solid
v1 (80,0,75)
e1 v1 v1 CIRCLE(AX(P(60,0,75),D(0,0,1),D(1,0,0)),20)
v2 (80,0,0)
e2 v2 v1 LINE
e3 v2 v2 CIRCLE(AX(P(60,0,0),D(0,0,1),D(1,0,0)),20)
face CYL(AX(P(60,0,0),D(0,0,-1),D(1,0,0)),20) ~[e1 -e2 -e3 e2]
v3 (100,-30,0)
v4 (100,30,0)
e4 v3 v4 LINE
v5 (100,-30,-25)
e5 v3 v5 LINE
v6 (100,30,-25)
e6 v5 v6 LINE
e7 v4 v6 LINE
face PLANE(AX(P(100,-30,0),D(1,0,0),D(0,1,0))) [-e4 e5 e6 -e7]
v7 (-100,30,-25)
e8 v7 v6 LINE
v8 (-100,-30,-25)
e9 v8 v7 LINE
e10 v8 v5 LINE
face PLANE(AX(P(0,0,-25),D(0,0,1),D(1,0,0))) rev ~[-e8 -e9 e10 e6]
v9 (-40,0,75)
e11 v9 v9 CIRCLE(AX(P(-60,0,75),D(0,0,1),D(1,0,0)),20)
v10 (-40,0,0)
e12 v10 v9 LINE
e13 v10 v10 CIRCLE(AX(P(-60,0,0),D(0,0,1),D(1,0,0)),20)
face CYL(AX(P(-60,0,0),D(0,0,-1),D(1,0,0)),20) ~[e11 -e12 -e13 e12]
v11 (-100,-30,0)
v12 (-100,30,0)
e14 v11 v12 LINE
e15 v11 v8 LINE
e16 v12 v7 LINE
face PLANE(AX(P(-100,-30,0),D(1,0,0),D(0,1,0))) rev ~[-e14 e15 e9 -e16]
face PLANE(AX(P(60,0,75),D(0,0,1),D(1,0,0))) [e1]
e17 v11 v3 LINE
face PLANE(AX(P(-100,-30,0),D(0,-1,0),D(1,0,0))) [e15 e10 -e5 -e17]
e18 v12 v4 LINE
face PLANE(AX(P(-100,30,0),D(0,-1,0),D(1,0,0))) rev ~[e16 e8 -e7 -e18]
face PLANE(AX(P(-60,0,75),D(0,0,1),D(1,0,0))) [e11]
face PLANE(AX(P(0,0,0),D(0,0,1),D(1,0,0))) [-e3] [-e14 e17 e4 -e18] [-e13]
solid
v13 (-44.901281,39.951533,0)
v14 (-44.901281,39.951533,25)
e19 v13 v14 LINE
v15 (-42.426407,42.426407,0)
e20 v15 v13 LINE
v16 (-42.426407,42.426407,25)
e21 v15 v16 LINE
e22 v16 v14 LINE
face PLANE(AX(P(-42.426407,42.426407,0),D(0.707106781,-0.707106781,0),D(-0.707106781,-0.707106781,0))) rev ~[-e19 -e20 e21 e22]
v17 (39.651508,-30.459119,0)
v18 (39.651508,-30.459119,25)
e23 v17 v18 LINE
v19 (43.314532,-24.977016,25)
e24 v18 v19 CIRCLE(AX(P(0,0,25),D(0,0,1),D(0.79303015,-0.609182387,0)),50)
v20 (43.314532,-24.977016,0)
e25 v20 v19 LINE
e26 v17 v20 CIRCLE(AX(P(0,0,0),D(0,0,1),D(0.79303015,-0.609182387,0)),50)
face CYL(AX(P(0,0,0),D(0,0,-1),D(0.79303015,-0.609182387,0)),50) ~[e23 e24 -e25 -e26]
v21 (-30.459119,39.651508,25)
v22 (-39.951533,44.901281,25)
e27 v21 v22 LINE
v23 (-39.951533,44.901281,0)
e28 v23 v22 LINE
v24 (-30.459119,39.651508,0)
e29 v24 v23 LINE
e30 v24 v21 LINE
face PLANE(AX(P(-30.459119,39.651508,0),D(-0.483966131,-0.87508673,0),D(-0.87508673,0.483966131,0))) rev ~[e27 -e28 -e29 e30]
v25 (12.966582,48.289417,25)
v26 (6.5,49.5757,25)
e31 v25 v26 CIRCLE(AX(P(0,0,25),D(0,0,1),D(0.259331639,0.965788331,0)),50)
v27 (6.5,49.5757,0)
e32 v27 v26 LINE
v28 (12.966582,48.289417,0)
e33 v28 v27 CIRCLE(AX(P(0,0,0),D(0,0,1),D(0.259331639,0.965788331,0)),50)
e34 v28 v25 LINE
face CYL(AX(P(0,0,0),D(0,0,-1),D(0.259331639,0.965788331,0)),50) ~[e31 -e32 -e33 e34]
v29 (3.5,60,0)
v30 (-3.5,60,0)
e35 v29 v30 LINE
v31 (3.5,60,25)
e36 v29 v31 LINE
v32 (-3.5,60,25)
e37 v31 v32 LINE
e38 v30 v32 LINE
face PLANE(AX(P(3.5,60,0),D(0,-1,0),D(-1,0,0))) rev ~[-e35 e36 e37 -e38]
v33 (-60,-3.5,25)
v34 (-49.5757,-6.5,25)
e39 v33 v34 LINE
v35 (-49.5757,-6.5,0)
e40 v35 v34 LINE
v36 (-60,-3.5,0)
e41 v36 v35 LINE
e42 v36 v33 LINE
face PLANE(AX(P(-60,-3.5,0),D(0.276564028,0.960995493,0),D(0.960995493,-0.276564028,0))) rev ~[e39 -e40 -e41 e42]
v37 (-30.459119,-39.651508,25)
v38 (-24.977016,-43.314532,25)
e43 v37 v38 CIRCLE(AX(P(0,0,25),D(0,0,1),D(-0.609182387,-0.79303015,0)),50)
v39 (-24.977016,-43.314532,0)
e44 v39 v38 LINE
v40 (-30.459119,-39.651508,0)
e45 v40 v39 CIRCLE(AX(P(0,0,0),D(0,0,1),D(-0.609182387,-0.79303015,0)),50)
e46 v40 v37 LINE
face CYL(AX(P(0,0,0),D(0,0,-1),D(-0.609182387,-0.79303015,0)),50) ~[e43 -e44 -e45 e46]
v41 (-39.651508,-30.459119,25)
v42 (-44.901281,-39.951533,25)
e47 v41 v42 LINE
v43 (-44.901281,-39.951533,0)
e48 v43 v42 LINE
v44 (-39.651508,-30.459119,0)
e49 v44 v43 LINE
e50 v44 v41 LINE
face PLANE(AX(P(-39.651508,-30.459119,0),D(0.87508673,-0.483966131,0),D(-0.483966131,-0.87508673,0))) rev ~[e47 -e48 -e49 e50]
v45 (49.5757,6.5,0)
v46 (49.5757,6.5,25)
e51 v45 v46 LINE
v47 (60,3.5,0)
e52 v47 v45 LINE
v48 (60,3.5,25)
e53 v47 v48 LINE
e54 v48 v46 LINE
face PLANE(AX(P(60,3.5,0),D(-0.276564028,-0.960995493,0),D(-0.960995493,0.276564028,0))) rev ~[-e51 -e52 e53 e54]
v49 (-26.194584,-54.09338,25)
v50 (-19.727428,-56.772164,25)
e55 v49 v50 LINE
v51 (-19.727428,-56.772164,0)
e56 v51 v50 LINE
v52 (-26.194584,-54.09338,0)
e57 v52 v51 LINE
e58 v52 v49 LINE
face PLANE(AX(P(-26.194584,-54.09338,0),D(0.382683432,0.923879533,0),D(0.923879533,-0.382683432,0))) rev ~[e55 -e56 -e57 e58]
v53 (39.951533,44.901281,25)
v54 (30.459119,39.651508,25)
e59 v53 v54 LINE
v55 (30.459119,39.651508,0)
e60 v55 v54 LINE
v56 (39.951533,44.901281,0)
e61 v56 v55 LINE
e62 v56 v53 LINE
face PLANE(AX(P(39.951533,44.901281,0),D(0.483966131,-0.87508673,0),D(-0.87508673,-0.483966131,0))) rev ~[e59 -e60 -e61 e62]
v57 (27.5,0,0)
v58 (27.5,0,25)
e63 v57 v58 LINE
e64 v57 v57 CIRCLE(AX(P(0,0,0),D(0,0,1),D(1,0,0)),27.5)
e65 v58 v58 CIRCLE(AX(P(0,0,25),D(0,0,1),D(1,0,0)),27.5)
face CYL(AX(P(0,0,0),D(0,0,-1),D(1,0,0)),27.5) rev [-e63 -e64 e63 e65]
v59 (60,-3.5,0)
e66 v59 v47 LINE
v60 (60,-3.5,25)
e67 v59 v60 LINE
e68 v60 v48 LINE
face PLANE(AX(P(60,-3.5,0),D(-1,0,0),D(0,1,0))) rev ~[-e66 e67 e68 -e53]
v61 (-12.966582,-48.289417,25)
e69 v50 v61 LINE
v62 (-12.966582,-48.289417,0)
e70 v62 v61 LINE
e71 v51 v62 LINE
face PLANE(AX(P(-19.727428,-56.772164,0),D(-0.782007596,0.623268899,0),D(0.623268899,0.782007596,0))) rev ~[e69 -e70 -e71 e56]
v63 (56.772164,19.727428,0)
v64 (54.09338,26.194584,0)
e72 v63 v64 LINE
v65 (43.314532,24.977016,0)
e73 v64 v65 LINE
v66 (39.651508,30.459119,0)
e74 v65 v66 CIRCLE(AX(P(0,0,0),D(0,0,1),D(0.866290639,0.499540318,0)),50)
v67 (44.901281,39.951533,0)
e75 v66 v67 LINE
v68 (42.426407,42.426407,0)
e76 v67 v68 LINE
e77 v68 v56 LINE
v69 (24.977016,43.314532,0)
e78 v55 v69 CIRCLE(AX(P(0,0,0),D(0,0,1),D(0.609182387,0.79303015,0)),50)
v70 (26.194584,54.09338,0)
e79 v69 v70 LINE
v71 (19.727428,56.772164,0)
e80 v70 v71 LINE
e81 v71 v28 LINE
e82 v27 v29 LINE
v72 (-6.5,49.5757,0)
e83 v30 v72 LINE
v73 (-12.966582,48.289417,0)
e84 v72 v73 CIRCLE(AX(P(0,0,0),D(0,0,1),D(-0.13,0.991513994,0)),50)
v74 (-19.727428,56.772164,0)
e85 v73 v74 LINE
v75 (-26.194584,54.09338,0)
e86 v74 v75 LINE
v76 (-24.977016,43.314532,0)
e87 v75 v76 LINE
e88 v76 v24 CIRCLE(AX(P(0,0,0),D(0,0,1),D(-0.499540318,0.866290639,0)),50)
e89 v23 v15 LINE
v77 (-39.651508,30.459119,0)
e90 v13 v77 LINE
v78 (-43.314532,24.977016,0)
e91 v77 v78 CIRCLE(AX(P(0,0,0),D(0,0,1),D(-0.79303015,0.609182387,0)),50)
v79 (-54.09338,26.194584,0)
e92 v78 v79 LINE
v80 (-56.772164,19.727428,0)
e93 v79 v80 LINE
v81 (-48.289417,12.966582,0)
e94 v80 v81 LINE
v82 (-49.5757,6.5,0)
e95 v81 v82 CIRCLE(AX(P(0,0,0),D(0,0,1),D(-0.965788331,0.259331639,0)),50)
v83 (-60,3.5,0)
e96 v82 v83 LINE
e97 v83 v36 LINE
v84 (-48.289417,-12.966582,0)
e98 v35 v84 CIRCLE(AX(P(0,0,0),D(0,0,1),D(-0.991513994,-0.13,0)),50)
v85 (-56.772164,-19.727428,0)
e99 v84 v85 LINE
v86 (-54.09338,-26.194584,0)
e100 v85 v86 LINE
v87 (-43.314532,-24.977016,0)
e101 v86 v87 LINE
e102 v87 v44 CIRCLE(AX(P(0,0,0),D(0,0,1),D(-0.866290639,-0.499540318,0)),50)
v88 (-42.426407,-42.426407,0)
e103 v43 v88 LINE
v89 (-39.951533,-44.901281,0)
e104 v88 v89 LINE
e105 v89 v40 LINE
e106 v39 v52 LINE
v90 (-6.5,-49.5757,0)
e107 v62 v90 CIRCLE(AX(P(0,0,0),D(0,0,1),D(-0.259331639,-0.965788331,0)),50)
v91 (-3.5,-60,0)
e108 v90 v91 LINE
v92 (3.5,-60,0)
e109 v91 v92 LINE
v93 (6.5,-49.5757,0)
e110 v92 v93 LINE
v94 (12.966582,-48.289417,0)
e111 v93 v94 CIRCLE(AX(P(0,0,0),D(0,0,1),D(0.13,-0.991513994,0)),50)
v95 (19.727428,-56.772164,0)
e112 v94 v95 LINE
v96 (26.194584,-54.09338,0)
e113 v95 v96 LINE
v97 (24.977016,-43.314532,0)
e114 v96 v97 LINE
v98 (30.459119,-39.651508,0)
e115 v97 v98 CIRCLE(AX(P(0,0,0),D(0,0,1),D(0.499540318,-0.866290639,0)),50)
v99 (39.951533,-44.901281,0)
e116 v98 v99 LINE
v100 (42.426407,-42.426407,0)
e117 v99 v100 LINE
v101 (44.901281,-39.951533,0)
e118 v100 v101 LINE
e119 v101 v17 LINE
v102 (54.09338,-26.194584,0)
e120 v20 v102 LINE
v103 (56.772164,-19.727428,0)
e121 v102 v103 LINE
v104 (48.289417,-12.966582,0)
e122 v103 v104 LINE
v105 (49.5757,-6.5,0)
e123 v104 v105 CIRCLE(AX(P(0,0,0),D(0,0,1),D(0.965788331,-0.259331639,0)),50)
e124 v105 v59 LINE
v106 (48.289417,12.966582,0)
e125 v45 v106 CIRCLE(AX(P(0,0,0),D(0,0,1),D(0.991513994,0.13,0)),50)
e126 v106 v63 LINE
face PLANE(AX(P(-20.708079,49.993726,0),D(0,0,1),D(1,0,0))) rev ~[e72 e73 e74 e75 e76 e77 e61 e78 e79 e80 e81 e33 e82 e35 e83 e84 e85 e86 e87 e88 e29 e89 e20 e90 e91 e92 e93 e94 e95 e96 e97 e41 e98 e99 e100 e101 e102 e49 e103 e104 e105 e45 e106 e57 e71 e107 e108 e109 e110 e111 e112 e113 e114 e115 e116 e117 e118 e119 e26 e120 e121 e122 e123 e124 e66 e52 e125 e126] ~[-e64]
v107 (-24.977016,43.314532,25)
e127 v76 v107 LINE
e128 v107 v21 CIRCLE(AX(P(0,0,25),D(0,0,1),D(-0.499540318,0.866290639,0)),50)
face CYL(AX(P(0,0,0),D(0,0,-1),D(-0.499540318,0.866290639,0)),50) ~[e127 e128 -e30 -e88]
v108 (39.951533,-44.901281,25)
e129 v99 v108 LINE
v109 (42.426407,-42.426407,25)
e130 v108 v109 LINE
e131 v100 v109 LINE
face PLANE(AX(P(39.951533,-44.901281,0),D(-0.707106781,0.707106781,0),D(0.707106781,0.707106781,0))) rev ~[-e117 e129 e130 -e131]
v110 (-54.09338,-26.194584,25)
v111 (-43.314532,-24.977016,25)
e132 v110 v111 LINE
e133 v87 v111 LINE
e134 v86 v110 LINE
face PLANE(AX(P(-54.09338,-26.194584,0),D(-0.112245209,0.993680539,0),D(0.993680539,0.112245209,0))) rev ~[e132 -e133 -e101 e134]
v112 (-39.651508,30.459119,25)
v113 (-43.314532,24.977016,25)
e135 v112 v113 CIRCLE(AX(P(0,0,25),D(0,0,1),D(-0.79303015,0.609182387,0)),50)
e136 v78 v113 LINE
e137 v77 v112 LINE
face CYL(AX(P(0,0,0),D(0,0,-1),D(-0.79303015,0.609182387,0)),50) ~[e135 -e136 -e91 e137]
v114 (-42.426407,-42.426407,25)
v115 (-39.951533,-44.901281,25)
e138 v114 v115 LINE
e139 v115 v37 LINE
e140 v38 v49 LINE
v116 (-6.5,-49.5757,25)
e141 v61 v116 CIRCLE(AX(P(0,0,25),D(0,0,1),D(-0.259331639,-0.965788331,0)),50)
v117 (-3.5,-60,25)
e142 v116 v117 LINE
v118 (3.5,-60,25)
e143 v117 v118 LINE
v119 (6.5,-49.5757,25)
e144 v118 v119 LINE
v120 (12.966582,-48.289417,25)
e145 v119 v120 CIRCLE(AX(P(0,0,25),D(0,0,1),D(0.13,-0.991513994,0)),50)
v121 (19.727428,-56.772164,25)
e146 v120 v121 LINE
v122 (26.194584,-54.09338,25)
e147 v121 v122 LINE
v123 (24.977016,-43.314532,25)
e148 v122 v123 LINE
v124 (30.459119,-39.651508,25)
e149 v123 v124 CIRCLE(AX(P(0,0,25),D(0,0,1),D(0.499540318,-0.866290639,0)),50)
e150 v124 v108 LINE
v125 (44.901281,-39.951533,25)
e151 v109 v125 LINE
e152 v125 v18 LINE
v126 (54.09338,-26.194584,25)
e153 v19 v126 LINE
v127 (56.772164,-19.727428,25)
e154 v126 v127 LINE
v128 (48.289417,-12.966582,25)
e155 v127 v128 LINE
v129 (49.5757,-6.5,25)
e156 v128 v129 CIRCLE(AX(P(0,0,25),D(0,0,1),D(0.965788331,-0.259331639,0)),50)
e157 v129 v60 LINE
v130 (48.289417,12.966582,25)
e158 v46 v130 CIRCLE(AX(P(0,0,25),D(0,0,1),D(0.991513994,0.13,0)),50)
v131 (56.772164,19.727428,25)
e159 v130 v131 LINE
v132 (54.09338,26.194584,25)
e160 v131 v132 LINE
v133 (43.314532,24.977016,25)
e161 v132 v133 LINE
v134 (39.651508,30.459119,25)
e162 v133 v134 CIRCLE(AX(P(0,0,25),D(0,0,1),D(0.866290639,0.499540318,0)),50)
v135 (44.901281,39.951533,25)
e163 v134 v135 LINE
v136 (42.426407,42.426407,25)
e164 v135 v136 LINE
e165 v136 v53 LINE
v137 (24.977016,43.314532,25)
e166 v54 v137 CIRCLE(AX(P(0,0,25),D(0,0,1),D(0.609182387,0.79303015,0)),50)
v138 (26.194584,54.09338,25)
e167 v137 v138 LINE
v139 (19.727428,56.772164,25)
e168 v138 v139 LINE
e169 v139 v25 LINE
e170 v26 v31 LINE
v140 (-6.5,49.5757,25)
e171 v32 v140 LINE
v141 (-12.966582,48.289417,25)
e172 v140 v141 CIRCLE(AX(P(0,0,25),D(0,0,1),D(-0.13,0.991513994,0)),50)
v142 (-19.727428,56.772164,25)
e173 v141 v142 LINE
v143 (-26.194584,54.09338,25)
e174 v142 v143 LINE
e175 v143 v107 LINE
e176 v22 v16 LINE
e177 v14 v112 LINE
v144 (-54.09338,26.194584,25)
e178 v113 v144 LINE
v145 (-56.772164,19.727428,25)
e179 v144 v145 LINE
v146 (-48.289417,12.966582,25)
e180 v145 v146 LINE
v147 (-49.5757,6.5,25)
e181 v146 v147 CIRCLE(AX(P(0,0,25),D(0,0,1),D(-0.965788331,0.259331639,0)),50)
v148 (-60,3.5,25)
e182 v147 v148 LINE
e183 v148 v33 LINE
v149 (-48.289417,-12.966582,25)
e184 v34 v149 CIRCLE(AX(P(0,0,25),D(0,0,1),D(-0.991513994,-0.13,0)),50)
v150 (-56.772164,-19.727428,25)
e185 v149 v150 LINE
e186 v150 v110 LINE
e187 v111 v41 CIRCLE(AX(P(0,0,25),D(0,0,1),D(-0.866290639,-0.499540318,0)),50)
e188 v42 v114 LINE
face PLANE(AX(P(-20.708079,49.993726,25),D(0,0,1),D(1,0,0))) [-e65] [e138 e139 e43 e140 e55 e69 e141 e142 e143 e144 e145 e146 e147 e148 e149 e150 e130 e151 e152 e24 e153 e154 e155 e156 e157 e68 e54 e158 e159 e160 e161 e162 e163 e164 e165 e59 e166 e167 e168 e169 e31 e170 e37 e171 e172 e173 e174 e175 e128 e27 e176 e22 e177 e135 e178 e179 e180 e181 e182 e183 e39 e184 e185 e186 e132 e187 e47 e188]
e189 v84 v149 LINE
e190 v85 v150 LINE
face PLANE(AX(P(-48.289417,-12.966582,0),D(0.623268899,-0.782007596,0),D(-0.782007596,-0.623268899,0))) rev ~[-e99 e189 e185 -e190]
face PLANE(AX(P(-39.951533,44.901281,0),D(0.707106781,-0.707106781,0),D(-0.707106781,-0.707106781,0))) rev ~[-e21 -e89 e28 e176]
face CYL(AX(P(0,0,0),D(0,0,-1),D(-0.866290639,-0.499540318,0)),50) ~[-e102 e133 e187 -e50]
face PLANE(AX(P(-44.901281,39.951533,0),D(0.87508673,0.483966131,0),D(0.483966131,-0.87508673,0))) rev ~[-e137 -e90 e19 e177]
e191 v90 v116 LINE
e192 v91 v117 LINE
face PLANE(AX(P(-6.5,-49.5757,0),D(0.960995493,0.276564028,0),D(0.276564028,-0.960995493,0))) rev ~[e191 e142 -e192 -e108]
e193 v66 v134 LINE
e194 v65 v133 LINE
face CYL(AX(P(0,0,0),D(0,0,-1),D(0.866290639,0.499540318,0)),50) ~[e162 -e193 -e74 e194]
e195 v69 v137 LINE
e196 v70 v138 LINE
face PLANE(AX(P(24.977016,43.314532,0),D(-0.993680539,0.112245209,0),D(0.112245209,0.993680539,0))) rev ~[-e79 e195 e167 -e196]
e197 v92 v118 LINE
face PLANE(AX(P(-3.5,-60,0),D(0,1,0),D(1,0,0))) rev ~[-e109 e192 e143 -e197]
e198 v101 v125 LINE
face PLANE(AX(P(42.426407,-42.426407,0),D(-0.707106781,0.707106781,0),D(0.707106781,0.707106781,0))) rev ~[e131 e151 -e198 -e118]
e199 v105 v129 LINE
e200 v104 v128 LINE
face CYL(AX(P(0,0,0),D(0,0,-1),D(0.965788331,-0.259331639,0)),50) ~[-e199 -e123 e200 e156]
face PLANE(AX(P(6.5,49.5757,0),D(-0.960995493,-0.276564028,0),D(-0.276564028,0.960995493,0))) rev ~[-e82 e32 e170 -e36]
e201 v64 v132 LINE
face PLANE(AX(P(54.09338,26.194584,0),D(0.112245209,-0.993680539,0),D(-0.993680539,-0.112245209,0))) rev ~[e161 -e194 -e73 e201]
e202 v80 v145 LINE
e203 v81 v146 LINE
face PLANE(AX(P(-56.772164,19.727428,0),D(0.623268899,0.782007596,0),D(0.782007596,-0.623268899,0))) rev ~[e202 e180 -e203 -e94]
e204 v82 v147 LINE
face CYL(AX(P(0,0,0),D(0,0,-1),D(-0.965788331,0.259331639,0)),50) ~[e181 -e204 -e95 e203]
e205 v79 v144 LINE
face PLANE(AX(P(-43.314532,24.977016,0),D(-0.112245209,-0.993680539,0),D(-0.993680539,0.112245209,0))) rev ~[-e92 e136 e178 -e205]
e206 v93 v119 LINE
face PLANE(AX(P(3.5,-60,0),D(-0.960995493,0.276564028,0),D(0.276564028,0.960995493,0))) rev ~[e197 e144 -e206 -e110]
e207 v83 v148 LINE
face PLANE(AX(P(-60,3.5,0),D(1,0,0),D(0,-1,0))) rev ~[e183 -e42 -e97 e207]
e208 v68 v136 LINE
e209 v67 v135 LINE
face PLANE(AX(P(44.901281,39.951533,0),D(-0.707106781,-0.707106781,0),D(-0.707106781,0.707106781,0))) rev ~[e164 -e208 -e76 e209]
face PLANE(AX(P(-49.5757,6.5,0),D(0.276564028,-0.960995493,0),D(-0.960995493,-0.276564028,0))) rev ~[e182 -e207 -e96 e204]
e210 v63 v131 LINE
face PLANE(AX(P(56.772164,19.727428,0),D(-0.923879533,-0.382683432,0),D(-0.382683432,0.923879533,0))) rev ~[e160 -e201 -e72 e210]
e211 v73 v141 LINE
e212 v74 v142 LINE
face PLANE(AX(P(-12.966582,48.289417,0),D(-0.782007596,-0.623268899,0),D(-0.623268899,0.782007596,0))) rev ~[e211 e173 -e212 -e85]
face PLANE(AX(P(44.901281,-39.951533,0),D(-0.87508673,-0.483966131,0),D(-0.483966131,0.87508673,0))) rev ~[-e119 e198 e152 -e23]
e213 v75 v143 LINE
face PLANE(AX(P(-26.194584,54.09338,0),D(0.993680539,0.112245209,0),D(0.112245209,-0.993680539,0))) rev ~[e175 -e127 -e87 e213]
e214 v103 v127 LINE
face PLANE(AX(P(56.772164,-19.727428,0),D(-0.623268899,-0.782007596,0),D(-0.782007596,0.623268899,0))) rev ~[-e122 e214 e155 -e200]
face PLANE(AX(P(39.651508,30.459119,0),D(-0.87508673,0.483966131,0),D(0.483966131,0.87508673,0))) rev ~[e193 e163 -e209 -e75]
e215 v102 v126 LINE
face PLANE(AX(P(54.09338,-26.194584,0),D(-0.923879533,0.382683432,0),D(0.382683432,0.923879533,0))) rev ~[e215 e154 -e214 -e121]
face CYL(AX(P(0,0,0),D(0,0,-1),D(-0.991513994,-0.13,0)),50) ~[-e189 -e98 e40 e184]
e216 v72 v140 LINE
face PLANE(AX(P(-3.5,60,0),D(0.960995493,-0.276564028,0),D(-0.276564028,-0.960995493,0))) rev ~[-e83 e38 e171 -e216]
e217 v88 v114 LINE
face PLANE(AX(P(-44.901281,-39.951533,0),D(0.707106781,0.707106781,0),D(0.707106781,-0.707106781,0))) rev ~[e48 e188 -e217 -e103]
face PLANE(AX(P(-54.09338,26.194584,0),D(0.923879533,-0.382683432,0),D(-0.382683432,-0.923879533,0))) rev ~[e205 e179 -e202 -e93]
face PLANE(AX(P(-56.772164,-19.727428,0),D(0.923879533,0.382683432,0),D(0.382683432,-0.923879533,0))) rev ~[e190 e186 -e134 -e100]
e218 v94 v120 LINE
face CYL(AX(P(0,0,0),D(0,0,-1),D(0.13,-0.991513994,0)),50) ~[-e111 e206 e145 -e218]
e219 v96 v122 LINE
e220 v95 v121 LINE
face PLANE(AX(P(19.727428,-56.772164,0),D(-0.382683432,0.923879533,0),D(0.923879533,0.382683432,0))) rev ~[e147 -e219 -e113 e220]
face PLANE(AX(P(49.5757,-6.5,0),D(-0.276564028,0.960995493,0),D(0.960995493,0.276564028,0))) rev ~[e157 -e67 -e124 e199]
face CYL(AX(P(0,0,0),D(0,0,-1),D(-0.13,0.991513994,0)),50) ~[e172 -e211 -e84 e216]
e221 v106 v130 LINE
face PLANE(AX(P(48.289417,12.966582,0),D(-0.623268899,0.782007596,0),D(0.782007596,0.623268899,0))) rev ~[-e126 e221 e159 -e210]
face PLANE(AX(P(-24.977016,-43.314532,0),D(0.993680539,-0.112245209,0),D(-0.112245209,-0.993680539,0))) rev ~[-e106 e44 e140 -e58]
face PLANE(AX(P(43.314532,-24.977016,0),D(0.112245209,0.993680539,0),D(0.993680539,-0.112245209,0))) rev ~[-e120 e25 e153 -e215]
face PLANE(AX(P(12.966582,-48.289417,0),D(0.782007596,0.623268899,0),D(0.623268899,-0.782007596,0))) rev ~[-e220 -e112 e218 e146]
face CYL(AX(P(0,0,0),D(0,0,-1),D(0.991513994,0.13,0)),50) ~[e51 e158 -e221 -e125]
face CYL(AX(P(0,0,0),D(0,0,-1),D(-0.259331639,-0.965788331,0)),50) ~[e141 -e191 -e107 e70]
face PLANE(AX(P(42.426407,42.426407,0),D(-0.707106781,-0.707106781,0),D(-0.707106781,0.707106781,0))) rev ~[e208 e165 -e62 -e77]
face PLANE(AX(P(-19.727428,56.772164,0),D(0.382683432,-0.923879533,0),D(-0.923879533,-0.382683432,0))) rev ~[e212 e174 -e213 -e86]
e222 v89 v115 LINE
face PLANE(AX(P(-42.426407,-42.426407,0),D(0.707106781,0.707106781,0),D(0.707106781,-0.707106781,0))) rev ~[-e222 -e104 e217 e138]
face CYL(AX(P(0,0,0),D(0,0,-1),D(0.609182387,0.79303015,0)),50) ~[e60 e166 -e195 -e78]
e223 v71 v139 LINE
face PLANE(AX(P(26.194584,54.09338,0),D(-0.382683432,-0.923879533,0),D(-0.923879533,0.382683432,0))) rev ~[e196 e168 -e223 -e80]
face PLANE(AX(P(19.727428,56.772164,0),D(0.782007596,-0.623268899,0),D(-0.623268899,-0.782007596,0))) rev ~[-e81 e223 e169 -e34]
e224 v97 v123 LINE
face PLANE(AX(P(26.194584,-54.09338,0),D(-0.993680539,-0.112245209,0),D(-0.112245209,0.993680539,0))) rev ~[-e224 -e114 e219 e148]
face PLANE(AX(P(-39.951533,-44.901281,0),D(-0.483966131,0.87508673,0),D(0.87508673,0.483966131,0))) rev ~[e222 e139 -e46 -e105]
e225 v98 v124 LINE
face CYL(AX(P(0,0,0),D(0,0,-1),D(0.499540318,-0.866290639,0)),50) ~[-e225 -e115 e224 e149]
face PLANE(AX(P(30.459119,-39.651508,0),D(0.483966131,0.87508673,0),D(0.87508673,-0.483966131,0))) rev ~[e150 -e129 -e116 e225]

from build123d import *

# Parameters (mm, degrees)
F0_R     = 27.5
F1_DEPTH = 25
F2_W     = 200
F2_H     = 60
F2_R     = 20
F3_DEPTH = 25
F4_DEPTH = 75


with BuildPart() as f1:
    # F0 (on Top) → F1 (new body)
    with BuildSketch(Plane.XY):
        with BuildLine():
            ThreePointArc((-24.9770158815, 43.3145319454), (-19.1341716183, 46.1939766256), (-12.9665819589, 48.2894165662))
            Line((-12.9665819589, 48.2894165662), (-19.7274275781, 56.772163964))
            Line((-19.7274275781, 56.772163964), (-22.9610059419, 55.4327719507))
            Line((-22.9610059419, 55.4327719507), (-26.1945843057, 54.0933799374))
            Line((-26.1945843057, 54.0933799374), (-24.9770158815, 43.3145319454))
        make_face()
        with BuildLine():
            ThreePointArc((-39.6515075123, 30.4591193569), (-35.3553390593, 35.3553390593), (-30.4591193569, 39.6515075123))
            Line((-30.4591193569, 39.6515075123), (-39.951533137, 44.9012806053))
            Line((-39.951533137, 44.9012806053), (-42.4264068712, 42.4264068712))
            Line((-42.4264068712, 42.4264068712), (-44.9012806053, 39.951533137))
            Line((-44.9012806053, 39.951533137), (-39.6515075123, 30.4591193569))
        make_face()
        with BuildLine():
            ThreePointArc((-48.2894165662, 12.9665819589), (-46.1939766256, 19.1341716183), (-43.3145319454, 24.9770158815))
            Line((-43.3145319454, 24.9770158815), (-54.0933799374, 26.1945843057))
            Line((-54.0933799374, 26.1945843057), (-55.4327719507, 22.9610059419))
            Line((-55.4327719507, 22.9610059419), (-56.772163964, 19.7274275781))
            Line((-56.772163964, 19.7274275781), (-48.2894165662, 12.9665819589))
        make_face()
        with BuildLine():
            Line((-54.0933799374, -26.1945843057), (-43.3145319454, -24.9770158815))
            ThreePointArc((-43.3145319454, -24.9770158815), (-46.1939766256, -19.1341716183), (-48.2894165662, -12.9665819589))
            Line((-48.2894165662, -12.9665819589), (-56.772163964, -19.7274275781))
            Line((-56.772163964, -19.7274275781), (-55.4327719507, -22.9610059419))
            Line((-55.4327719507, -22.9610059419), (-54.0933799374, -26.1945843057))
        make_face()
        with BuildLine():
            Line((-39.951533137, -44.9012806053), (-30.4591193569, -39.6515075123))
            ThreePointArc((-30.4591193569, -39.6515075123), (-35.3553390593, -35.3553390593), (-39.6515075123, -30.4591193569))
            Line((-39.6515075123, -30.4591193569), (-44.9012806053, -39.951533137))
            Line((-44.9012806053, -39.951533137), (-42.4264068712, -42.4264068712))
            Line((-42.4264068712, -42.4264068712), (-39.951533137, -44.9012806053))
        make_face()
        with BuildLine():
            Line((-19.7274275781, -56.772163964), (-12.9665819589, -48.2894165662))
            ThreePointArc((-12.9665819589, -48.2894165662), (-19.1341716183, -46.1939766256), (-24.9770158815, -43.3145319454))
            Line((-24.9770158815, -43.3145319454), (-26.1945843057, -54.0933799374))
            Line((-26.1945843057, -54.0933799374), (-22.9610059419, -55.4327719507))
            Line((-22.9610059419, -55.4327719507), (-19.7274275781, -56.772163964))
        make_face()
        with BuildLine():
            Line((26.1945843057, -54.0933799374), (24.9770158815, -43.3145319454))
            ThreePointArc((24.9770158815, -43.3145319454), (19.1341716183, -46.1939766256), (12.9665819589, -48.2894165662))
            Line((12.9665819589, -48.2894165662), (19.7274275781, -56.772163964))
            Line((19.7274275781, -56.772163964), (22.9610059419, -55.4327719507))
            Line((22.9610059419, -55.4327719507), (26.1945843057, -54.0933799374))
        make_face()
        with BuildLine():
            Line((44.9012806053, -39.951533137), (39.6515075123, -30.4591193569))
            ThreePointArc((39.6515075123, -30.4591193569), (35.3553390593, -35.3553390593), (30.4591193569, -39.6515075123))
            Line((30.4591193569, -39.6515075123), (39.951533137, -44.9012806053))
            Line((39.951533137, -44.9012806053), (42.4264068712, -42.4264068712))
            Line((42.4264068712, -42.4264068712), (44.9012806053, -39.951533137))
        make_face()
        with BuildLine():
            Line((56.772163964, -19.7274275781), (48.2894165662, -12.9665819589))
            ThreePointArc((48.2894165662, -12.9665819589), (46.1939766256, -19.1341716183), (43.3145319454, -24.9770158815))
            Line((43.3145319454, -24.9770158815), (54.0933799374, -26.1945843057))
            Line((54.0933799374, -26.1945843057), (55.4327719507, -22.9610059419))
            Line((55.4327719507, -22.9610059419), (56.772163964, -19.7274275781))
        make_face()
        with BuildLine():
            ThreePointArc((49.5756996925, 6.5), (49.8938121646, 3.2569168991), (50, 0))
            ThreePointArc((50, 0), (49.8938121646, -3.2569168991), (49.5756996925, -6.5))
            Line((49.5756996925, -6.5), (60, -3.5))
            Line((60, -3.5), (60, 0))
            Line((60, 0), (60, 3.5))
            Line((60, 3.5), (49.5756996925, 6.5))
        make_face()
        with BuildLine():
            ThreePointArc((43.3145319454, 24.9770158815), (46.1939766256, 19.1341716183), (48.2894165662, 12.9665819589))
            Line((48.2894165662, 12.9665819589), (56.772163964, 19.7274275781))
            Line((56.772163964, 19.7274275781), (55.4327719507, 22.9610059419))
            Line((55.4327719507, 22.9610059419), (54.0933799374, 26.1945843057))
            Line((54.0933799374, 26.1945843057), (43.3145319454, 24.9770158815))
        make_face()
        with BuildLine():
            ThreePointArc((30.4591193569, 39.6515075123), (35.3553390593, 35.3553390593), (39.6515075123, 30.4591193569))
            Line((39.6515075123, 30.4591193569), (44.9012806053, 39.951533137))
            Line((44.9012806053, 39.951533137), (42.4264068712, 42.4264068712))
            Line((42.4264068712, 42.4264068712), (39.951533137, 44.9012806053))
            Line((39.951533137, 44.9012806053), (30.4591193569, 39.6515075123))
        make_face()
        with BuildLine():
            ThreePointArc((12.9665819589, 48.2894165662), (19.1341716183, 46.1939766256), (24.9770158815, 43.3145319454))
            Line((24.9770158815, 43.3145319454), (26.1945843057, 54.0933799374))
            Line((26.1945843057, 54.0933799374), (22.9610059419, 55.4327719507))
            Line((22.9610059419, 55.4327719507), (19.7274275781, 56.772163964))
            Line((19.7274275781, 56.772163964), (12.9665819589, 48.2894165662))
        make_face()
        with BuildLine():
            ThreePointArc((-6.5, 49.5756996925), (0, 50), (6.5, 49.5756996925))
            Line((6.5, 49.5756996925), (3.5, 60))
            Line((3.5, 60), (0, 60))
            Line((0, 60), (-3.5, 60))
            Line((-3.5, 60), (-6.5, 49.5756996925))
        make_face()
        with BuildLine():
            Line((3.5, -60), (6.5, -49.5756996925))
            ThreePointArc((6.5, -49.5756996925), (0, -50), (-6.5, -49.5756996925))
            Line((-6.5, -49.5756996925), (-3.5, -60))
            Line((-3.5, -60), (0, -60))
            Line((0, -60), (3.5, -60))
        make_face()
        with BuildLine():
            ThreePointArc((-49.5756996925, -6.5), (-50, 0), (-49.5756996925, 6.5))
            Line((-49.5756996925, 6.5), (-60, 3.5))
            Line((-60, 3.5), (-60, 0))
            Line((-60, 0), (-60, -3.5))
            Line((-60, -3.5), (-49.5756996925, -6.5))
        make_face()
        with BuildLine():
            ThreePointArc((49.5756996925, -6.5), (49.8938121646, -3.2569168991), (50, 0))
            ThreePointArc((50, 0), (49.8938121646, 3.2569168991), (49.5756996925, 6.5))
            ThreePointArc((49.5756996925, 6.5), (49.0392640202, 9.7545161008), (48.2894165662, 12.9665819589))
            ThreePointArc((48.2894165662, 12.9665819589), (46.1939766256, 19.1341716183), (43.3145319454, 24.9770158815))
            ThreePointArc((43.3145319454, 24.9770158815), (41.5734806151, 27.778511651), (39.6515075123, 30.4591193569))
            ThreePointArc((39.6515075123, 30.4591193569), (35.3553390593, 35.3553390593), (30.4591193569, 39.6515075123))
            ThreePointArc((30.4591193569, 39.6515075123), (27.778511651, 41.5734806151), (24.9770158815, 43.3145319454))
            ThreePointArc((24.9770158815, 43.3145319454), (19.1341716183, 46.1939766256), (12.9665819589, 48.2894165662))
            ThreePointArc((12.9665819589, 48.2894165662), (9.7545161008, 49.0392640202), (6.5, 49.5756996925))
            ThreePointArc((6.5, 49.5756996925), (0, 50), (-6.5, 49.5756996925))
            ThreePointArc((-6.5, 49.5756996925), (-9.7545161008, 49.0392640202), (-12.9665819589, 48.2894165662))
            ThreePointArc((-12.9665819589, 48.2894165662), (-19.1341716183, 46.1939766256), (-24.9770158815, 43.3145319454))
            ThreePointArc((-24.9770158815, 43.3145319454), (-27.778511651, 41.5734806151), (-30.4591193569, 39.6515075123))
            ThreePointArc((-30.4591193569, 39.6515075123), (-35.3553390593, 35.3553390593), (-39.6515075123, 30.4591193569))
            ThreePointArc((-39.6515075123, 30.4591193569), (-41.5734806151, 27.778511651), (-43.3145319454, 24.9770158815))
            ThreePointArc((-43.3145319454, 24.9770158815), (-46.1939766256, 19.1341716183), (-48.2894165662, 12.9665819589))
            ThreePointArc((-48.2894165662, 12.9665819589), (-49.0392640202, 9.7545161008), (-49.5756996925, 6.5))
            ThreePointArc((-49.5756996925, 6.5), (-50, 0), (-49.5756996925, -6.5))
            ThreePointArc((-49.5756996925, -6.5), (-49.0392640202, -9.7545161008), (-48.2894165662, -12.9665819589))
            ThreePointArc((-48.2894165662, -12.9665819589), (-46.1939766256, -19.1341716183), (-43.3145319454, -24.9770158815))
            ThreePointArc((-43.3145319454, -24.9770158815), (-41.5734806151, -27.778511651), (-39.6515075123, -30.4591193569))
            ThreePointArc((-39.6515075123, -30.4591193569), (-35.3553390593, -35.3553390593), (-30.4591193569, -39.6515075123))
            ThreePointArc((-30.4591193569, -39.6515075123), (-27.778511651, -41.5734806151), (-24.9770158815, -43.3145319454))
            ThreePointArc((-24.9770158815, -43.3145319454), (-19.1341716183, -46.1939766256), (-12.9665819589, -48.2894165662))
            ThreePointArc((-12.9665819589, -48.2894165662), (-9.7545161008, -49.0392640202), (-6.5, -49.5756996925))
            ThreePointArc((-6.5, -49.5756996925), (0, -50), (6.5, -49.5756996925))
            ThreePointArc((6.5, -49.5756996925), (9.7545161008, -49.0392640202), (12.9665819589, -48.2894165662))
            ThreePointArc((12.9665819589, -48.2894165662), (19.1341716183, -46.1939766256), (24.9770158815, -43.3145319454))
            ThreePointArc((24.9770158815, -43.3145319454), (27.778511651, -41.5734806151), (30.4591193569, -39.6515075123))
            ThreePointArc((30.4591193569, -39.6515075123), (35.3553390593, -35.3553390593), (39.6515075123, -30.4591193569))
            ThreePointArc((39.6515075123, -30.4591193569), (41.5734806151, -27.778511651), (43.3145319454, -24.9770158815))
            ThreePointArc((43.3145319454, -24.9770158815), (46.1939766256, -19.1341716183), (48.2894165662, -12.9665819589))
            ThreePointArc((48.2894165662, -12.9665819589), (49.0392640202, -9.7545161008), (49.5756996925, -6.5))
        make_face()
        Circle(F0_R, mode=Mode.SUBTRACT)
    extrude(amount=F1_DEPTH)


with BuildPart() as f3:
    # F2 (on Top) → F3 (new body)
    with BuildSketch(Plane.XY):
        Rectangle(F2_W, F2_H)
        with Locations((-60, 0)):
            Circle(F2_R, mode=Mode.SUBTRACT)
        with Locations((60, 0)):
            Circle(F2_R, mode=Mode.SUBTRACT)
        with Locations((-60, 0)):
            Circle(F2_R)
        with Locations((60, 0)):
            Circle(F2_R)
    extrude(amount=-F3_DEPTH)

    # F2 (on Top) → F4 (join)
    with BuildSketch(Plane.XY):
        with Locations((60, 0)):
            Circle(F2_R)
        with Locations((-60, 0)):
            Circle(F2_R)
    extrude(amount=F4_DEPTH)


solid = Compound([f1.part, f3.part])
